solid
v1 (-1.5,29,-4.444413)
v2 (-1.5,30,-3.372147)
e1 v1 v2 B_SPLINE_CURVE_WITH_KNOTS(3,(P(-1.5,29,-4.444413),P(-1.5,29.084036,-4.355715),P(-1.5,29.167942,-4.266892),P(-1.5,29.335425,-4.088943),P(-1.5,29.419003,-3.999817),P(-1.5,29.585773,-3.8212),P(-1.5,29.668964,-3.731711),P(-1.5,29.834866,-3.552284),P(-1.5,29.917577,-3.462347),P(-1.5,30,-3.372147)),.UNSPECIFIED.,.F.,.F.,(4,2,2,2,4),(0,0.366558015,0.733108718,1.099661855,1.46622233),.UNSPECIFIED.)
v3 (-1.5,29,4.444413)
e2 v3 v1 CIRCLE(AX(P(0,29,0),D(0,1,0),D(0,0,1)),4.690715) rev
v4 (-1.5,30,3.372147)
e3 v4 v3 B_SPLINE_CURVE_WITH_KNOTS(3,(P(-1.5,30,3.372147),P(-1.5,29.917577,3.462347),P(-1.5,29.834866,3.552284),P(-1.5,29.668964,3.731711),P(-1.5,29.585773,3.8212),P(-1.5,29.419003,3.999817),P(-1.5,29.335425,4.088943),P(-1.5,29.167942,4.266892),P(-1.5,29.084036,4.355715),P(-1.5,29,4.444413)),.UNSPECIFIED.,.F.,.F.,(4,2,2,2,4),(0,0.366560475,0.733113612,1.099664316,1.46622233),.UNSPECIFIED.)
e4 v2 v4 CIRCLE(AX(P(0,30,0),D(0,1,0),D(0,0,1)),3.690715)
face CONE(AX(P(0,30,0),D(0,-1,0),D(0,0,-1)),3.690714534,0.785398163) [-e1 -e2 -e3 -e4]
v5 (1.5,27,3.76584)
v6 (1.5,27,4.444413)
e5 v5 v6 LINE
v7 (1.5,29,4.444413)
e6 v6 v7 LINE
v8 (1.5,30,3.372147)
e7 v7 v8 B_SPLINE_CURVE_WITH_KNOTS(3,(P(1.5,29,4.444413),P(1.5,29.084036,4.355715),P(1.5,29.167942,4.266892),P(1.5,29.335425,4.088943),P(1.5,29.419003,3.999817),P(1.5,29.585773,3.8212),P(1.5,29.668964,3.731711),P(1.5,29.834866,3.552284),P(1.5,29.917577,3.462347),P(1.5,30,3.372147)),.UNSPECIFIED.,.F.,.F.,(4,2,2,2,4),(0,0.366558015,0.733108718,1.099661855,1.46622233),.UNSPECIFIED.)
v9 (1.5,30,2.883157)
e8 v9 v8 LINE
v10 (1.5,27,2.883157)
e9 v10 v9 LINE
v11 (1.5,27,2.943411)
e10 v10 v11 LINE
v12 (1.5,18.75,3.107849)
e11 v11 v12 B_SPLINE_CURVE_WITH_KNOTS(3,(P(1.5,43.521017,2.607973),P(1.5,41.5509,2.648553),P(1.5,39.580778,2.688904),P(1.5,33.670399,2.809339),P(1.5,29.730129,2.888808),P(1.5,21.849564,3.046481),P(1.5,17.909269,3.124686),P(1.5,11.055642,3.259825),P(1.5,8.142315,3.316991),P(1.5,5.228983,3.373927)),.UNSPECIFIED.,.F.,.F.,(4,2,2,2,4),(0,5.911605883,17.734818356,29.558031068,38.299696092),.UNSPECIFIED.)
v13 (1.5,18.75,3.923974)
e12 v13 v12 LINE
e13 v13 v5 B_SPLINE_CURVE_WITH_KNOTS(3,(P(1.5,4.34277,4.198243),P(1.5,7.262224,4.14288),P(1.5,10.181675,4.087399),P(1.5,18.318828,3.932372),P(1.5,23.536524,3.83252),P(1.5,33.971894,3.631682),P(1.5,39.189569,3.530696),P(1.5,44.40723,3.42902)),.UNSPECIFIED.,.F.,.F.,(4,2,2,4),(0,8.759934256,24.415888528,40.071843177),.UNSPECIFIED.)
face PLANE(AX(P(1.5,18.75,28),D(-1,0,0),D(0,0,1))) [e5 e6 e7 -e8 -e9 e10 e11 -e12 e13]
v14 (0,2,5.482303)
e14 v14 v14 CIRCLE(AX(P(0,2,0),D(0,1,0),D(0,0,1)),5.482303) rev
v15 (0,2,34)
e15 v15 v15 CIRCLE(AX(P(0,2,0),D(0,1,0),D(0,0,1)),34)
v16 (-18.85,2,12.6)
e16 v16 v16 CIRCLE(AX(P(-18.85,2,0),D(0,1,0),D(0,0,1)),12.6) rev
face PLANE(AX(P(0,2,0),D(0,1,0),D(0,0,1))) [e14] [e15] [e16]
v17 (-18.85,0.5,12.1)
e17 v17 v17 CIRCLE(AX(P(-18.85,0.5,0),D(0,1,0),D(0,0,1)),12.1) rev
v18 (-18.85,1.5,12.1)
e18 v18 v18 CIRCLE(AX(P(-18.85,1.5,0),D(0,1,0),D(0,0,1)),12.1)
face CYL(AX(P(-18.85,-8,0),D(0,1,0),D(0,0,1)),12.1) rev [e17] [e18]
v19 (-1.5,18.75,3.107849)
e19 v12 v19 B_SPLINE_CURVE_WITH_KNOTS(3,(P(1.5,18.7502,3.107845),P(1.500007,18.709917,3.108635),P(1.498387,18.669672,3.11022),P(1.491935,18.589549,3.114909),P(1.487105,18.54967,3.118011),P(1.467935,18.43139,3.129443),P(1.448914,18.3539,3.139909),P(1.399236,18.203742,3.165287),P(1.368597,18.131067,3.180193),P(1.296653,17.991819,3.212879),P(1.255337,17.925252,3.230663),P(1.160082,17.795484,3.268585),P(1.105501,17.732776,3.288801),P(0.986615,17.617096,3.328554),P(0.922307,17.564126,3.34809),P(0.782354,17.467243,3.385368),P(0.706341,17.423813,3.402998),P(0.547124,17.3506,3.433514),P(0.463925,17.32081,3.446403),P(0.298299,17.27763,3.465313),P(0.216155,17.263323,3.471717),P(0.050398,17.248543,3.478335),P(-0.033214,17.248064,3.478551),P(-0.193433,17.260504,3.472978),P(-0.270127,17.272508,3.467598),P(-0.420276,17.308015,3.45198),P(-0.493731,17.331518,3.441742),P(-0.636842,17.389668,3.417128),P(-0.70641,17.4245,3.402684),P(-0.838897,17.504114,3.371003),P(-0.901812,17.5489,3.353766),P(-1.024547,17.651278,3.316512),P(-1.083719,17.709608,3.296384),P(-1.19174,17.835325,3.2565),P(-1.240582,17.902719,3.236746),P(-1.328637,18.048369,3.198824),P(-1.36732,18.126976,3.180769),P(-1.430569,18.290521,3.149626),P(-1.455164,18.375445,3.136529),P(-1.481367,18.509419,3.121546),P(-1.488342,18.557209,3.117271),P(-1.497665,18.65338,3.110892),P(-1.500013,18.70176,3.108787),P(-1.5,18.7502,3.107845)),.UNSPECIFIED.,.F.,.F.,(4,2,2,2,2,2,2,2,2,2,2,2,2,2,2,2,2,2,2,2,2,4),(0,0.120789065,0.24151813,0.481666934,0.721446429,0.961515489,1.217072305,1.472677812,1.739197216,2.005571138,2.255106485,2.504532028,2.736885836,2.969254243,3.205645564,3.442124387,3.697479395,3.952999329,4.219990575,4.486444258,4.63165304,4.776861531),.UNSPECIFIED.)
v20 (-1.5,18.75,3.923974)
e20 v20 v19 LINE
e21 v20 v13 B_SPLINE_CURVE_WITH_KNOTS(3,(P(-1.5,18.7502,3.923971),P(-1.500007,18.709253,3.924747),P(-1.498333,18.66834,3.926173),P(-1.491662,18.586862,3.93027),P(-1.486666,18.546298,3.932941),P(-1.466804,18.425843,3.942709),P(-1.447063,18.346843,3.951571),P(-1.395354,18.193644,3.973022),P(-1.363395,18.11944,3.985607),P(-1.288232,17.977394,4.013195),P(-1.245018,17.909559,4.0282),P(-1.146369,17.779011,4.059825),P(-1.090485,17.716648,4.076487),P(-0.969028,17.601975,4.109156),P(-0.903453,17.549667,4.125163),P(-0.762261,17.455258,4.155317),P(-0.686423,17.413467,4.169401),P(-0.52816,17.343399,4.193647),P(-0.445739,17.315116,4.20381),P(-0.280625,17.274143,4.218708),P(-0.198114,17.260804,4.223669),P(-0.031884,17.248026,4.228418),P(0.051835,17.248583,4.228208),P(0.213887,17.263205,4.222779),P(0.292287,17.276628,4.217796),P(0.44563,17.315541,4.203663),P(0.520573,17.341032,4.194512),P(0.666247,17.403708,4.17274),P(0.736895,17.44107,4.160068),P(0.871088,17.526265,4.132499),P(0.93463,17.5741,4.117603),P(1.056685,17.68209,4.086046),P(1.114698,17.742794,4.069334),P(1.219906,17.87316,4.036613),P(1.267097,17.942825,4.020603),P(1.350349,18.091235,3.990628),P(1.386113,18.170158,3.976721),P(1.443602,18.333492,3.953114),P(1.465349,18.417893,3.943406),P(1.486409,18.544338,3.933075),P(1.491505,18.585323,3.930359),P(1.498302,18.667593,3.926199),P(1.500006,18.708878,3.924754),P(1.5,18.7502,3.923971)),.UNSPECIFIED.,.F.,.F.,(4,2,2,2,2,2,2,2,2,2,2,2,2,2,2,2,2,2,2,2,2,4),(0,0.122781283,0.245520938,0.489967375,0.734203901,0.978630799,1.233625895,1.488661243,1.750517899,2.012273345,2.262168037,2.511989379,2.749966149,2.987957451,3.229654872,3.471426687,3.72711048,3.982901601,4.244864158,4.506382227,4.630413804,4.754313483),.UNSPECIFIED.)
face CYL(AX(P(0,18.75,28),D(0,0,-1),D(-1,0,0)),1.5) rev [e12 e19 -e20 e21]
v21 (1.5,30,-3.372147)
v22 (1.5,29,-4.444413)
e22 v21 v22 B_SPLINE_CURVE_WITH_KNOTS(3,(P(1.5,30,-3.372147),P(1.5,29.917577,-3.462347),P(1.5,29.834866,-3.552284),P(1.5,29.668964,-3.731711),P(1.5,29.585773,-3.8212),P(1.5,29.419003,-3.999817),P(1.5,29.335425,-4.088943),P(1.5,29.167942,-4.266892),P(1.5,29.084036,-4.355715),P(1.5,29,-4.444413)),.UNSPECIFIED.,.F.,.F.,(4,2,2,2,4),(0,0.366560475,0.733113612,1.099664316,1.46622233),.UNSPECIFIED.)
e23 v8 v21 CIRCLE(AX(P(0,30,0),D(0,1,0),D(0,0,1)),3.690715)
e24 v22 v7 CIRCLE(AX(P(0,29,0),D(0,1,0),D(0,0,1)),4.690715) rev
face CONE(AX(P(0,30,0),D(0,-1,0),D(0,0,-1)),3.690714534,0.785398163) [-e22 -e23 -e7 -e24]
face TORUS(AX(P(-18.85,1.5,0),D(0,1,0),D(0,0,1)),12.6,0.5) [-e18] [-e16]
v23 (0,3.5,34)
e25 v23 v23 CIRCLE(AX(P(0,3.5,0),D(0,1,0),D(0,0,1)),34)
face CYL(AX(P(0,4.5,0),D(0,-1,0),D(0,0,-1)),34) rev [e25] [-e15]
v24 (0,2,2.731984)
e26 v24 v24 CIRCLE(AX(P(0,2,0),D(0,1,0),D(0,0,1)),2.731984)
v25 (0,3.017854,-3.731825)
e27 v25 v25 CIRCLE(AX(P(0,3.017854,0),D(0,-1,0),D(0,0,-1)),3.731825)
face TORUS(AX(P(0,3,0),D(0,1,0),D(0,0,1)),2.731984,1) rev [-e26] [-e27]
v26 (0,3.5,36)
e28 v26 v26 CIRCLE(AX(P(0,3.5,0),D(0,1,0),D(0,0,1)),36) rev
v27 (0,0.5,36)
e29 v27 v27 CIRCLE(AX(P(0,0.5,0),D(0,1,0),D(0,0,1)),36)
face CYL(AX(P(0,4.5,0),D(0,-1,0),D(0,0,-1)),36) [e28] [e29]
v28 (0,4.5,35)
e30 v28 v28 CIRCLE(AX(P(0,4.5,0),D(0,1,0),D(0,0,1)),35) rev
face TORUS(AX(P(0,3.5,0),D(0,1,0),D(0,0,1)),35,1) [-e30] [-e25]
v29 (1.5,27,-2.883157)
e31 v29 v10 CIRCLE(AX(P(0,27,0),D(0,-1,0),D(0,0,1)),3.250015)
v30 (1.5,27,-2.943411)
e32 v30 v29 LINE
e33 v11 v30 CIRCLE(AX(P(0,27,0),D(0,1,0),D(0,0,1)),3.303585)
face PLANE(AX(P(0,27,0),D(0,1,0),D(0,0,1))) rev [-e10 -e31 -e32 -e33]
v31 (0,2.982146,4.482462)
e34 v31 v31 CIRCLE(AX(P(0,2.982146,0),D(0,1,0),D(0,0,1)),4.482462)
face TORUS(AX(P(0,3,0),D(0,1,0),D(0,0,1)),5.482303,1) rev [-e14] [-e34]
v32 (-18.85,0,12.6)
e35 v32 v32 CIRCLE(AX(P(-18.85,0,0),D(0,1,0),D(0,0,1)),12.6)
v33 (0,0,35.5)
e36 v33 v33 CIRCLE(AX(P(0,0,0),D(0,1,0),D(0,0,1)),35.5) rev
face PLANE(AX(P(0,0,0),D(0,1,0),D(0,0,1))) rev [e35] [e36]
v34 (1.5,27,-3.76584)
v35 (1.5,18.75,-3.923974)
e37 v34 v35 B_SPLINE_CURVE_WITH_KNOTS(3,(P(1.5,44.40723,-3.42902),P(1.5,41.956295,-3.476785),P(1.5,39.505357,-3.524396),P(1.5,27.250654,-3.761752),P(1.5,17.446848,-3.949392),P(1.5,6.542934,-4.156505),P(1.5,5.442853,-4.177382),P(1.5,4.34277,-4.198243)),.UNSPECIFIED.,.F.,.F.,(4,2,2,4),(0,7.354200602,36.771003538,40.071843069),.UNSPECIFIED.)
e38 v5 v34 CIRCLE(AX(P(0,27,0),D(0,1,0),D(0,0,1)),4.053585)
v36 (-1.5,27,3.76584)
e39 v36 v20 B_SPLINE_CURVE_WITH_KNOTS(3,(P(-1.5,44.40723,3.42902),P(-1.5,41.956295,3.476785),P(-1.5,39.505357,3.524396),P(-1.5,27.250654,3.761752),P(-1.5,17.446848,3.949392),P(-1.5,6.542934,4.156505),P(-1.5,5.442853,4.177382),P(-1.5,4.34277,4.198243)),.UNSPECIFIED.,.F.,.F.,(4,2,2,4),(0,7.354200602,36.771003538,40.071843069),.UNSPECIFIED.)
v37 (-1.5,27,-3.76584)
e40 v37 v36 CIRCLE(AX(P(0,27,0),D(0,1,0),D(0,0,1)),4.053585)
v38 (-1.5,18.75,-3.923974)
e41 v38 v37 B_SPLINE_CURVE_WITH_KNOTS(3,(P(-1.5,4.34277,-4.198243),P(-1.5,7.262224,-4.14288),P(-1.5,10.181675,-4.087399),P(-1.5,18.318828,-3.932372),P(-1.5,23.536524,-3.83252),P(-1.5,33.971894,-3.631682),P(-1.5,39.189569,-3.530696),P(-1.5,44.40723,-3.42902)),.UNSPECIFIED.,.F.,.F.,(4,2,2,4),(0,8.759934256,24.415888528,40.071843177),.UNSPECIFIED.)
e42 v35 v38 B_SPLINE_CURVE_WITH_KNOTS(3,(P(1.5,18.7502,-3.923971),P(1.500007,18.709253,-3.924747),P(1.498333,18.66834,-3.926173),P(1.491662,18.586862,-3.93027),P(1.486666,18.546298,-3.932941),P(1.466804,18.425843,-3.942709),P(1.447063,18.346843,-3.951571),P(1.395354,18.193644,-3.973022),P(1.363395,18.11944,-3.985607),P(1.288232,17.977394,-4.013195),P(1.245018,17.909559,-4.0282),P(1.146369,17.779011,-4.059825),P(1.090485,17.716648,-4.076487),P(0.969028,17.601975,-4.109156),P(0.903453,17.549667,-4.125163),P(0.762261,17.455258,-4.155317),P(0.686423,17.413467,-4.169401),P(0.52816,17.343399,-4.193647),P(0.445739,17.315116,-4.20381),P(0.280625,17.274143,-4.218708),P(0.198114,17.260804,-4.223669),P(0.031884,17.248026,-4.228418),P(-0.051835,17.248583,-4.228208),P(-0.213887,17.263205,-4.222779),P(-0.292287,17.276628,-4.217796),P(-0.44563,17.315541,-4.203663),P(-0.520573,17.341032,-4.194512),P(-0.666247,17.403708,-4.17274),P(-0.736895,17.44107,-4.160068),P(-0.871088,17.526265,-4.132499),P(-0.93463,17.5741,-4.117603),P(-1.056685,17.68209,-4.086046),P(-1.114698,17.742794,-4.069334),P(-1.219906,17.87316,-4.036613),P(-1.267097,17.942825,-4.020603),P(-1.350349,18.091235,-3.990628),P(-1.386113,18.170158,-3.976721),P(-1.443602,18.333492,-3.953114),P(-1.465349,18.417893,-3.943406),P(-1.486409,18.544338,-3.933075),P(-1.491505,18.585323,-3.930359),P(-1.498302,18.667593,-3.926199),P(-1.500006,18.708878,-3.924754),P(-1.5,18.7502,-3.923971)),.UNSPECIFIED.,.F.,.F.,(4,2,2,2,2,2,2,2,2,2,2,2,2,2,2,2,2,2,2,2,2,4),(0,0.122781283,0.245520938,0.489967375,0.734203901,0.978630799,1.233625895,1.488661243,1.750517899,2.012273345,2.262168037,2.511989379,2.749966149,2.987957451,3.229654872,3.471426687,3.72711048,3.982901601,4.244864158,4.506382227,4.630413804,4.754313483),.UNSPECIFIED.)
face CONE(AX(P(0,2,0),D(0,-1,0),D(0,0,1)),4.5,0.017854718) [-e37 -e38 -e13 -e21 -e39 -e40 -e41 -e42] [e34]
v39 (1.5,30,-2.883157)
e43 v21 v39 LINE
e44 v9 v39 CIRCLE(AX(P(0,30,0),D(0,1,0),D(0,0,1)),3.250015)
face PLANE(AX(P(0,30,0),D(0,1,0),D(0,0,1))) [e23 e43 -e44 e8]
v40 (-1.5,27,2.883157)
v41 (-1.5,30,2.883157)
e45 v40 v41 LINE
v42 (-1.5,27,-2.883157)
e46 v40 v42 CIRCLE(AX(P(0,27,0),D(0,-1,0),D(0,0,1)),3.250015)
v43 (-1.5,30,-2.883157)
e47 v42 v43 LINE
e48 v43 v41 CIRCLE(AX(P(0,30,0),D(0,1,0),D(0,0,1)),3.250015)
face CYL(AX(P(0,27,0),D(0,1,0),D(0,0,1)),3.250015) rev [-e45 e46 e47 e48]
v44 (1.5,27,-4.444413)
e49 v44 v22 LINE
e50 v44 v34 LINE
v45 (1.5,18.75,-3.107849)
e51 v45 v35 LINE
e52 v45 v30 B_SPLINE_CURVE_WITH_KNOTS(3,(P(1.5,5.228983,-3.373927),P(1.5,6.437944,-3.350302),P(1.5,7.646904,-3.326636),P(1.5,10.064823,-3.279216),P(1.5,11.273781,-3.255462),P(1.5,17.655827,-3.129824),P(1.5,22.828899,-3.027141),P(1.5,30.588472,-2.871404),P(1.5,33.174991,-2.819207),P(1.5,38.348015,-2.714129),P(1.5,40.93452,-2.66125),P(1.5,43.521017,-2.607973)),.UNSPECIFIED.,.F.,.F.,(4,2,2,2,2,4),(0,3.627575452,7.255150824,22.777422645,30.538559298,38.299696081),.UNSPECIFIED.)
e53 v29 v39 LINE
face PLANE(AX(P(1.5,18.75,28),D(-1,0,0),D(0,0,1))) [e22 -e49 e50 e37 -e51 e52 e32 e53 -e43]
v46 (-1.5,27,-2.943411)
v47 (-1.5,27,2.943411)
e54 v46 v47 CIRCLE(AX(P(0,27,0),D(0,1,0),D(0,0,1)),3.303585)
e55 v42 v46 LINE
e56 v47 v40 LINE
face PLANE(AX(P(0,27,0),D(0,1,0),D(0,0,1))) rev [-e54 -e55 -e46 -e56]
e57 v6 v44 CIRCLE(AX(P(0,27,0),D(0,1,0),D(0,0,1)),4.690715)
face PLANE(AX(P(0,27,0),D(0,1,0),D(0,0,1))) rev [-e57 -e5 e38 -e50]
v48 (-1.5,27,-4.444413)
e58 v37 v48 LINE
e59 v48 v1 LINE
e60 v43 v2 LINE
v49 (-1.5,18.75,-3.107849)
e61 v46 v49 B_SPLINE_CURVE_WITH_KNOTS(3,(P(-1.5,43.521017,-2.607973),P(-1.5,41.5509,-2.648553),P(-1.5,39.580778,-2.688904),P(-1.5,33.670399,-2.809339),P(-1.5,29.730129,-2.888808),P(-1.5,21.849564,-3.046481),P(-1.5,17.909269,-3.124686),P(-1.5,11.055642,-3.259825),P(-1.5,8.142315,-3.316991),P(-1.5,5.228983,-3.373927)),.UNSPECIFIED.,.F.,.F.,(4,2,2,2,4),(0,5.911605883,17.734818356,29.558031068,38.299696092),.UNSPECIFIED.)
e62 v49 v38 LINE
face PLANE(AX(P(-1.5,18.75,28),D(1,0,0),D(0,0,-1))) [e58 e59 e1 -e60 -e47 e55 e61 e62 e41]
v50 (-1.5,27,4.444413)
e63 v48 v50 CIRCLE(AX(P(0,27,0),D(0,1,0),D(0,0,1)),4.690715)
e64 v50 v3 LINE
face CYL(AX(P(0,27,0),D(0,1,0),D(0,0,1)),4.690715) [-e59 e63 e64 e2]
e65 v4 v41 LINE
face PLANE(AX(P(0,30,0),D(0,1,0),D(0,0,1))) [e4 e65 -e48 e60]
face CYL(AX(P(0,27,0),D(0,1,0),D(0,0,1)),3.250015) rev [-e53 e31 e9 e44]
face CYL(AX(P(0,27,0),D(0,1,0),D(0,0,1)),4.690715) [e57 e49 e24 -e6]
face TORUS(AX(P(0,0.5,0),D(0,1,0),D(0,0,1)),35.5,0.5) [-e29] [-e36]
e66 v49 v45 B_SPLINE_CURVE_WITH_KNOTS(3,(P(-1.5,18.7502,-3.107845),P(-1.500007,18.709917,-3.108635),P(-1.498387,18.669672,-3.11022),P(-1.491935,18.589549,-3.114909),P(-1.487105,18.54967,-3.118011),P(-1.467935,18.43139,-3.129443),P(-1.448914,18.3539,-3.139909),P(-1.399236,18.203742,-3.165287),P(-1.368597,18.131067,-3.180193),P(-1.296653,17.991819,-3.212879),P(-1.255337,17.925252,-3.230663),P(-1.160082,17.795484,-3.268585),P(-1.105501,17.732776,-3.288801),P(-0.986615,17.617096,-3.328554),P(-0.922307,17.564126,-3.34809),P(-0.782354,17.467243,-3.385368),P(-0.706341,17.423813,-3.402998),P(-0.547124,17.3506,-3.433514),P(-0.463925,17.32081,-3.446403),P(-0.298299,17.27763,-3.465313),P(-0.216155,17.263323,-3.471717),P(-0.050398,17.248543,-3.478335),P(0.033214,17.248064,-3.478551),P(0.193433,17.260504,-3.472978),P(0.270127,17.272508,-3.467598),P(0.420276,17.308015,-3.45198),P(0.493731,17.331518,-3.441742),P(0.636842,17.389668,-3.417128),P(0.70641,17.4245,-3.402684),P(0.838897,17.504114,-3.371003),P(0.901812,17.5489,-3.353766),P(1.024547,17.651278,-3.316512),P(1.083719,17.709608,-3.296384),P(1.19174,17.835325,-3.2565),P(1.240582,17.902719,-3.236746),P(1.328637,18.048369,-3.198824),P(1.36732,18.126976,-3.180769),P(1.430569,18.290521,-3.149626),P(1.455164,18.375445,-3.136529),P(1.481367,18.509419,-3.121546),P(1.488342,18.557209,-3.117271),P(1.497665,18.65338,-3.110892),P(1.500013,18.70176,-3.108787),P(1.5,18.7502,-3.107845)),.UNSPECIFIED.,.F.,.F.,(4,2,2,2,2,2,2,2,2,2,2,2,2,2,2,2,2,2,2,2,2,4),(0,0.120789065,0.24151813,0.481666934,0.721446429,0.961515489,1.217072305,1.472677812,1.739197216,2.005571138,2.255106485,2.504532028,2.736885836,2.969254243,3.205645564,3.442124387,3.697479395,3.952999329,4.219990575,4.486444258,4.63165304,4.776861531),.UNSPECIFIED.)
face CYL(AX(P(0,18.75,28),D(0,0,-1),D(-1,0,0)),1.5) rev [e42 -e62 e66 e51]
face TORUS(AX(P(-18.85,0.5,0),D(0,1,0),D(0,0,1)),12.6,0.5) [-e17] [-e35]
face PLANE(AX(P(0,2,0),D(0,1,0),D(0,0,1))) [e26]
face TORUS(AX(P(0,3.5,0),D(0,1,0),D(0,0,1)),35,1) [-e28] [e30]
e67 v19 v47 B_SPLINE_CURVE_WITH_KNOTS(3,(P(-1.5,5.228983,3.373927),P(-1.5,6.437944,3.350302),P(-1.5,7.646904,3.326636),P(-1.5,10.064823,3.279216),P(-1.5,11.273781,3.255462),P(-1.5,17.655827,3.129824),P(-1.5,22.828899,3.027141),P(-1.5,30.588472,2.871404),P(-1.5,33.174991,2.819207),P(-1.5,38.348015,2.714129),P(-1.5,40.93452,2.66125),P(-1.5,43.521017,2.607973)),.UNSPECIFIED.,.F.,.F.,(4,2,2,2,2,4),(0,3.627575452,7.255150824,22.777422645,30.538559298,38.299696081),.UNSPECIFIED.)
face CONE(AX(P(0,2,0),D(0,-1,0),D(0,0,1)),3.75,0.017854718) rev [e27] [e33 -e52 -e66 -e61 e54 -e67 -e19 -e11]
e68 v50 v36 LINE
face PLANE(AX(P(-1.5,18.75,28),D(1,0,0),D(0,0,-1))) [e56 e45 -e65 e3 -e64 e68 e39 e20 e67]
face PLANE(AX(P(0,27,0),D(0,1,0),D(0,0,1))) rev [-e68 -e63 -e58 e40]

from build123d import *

# Parameters (mm, degrees)
SKETCH1_R               = 36
BOSS_EXTRUDE1_DEPTH     = 4.5
SHELL1_T                = -2
SKETCH2_R               = 4.5
BOSS_EXTRUDE2_DEPTH     = 28
BOSS_EXTRUDE2_TAPER     = 1.023
CUT_EXTRUDE1_DEPTH      = 28
CUT_EXTRUDE1_DEPTH_BACK = 28
SKETCH5_R               = 3.75
CUT_EXTRUDE2_DEPTH      = 28
CUT_EXTRUDE2_TAPER      = 1.023
FILLET1_R               = 1
FILLET2_R               = 1
BOSS_EXTRUDE3_DEPTH     = 3
CHAMFER1_SIZE           = 1
SKETCH8_R               = 12.1
CUT_EXTRUDE3_DEPTH      = 10
FILLET3_R               = 0.5
FILLET4_R               = 1


with BuildPart() as part:
    # Sketch1 → Boss-Extrude1 (new body)
    with BuildSketch(Plane(origin=(0, 0, 0), x_dir=(1, 0, 0), z_dir=(0, 1, 0))):
        with Locations(Location((0, 0, 0), (0, 0, 270))):
            Circle(SKETCH1_R)
    extrude(amount=BOSS_EXTRUDE1_DEPTH)

    # Shell1
    shell1_openings = [part.faces().sort_by_distance(p)[0] for p in [
        (0, 4.5, 0),
    ]]
    offset(amount=SHELL1_T, openings=shell1_openings, kind=Kind.INTERSECTION)

    # Sketch2 → Boss-Extrude2 (add)
    with BuildSketch(Plane(origin=(0, 2, 0), x_dir=(1, 0, 0), z_dir=(0, 1, 0))):
        Circle(SKETCH2_R)
    extrude(amount=BOSS_EXTRUDE2_DEPTH, taper=BOSS_EXTRUDE2_TAPER)

    # Sketch3 → Cut-Extrude1 (cut, two sides: drawn at the far end of the back side and taken through both)
    with BuildSketch(Plane.XY.offset(-CUT_EXTRUDE1_DEPTH_BACK)):
        with BuildLine():
            Line((-1.5, 18.75), (-1.5, 30))
            ThreePointArc((-1.5, 30), (0, 31.5), (1.5, 30))
            Line((1.5, 30), (1.5, 18.75))
            ThreePointArc((1.5, 18.75), (0, 17.25), (-1.5, 18.75))
        make_face()
    extrude(amount=CUT_EXTRUDE1_DEPTH + CUT_EXTRUDE1_DEPTH_BACK, mode=Mode.SUBTRACT)

    # Sketch5 → Cut-Extrude2 (cut)
    with BuildSketch(Plane(origin=(0, 2, 0), x_dir=(1, 0, 0), z_dir=(0, 1, 0))):
        Circle(SKETCH5_R)
    extrude(amount=CUT_EXTRUDE2_DEPTH, taper=CUT_EXTRUDE2_TAPER, mode=Mode.SUBTRACT)

    # Fillet1
    fillet1_edges = [part.edges().sort_by_distance(p)[0] for p in [
        (-3.75, 2, 0),
    ]]
    fillet(fillet1_edges, radius=FILLET1_R)

    # Fillet2
    fillet2_edges = [part.edges().sort_by_distance(p)[0] for p in [
        (0, 4.5, -36),
        (0, 4.5, -34),
    ]]
    fillet(fillet2_edges, radius=FILLET2_R - 0.0001)  # a hair under: the kernel refuses the full size

    # Sketch6 → Boss-Extrude3 (add)
    with BuildSketch(Plane(origin=(0, 30, 0), x_dir=(1, 0, 0), z_dir=(0, 1, 0))):
        with BuildLine():
            Line((1.5, 2.883157284), (1.5, 4.444412541))
            ThreePointArc((1.5, 4.444412541), (4.690714534, 0), (1.5, -4.444412541))
            Line((1.5, -4.444412541), (1.5, -2.883157284))
            ThreePointArc((1.5, -2.883157284), (3.250014758, 0), (1.5, 2.883157284))
        make_face()
        with BuildLine():
            Line((-1.5, 2.883157284), (-1.5, 4.444412541))
            ThreePointArc((-1.5, 4.444412541), (-4.690714534, 0), (-1.5, -4.444412541))
            Line((-1.5, -4.444412541), (-1.5, -2.883157284))
            ThreePointArc((-1.5, -2.883157284), (-3.250014758, 0), (-1.5, 2.883157284))
        make_face()
    extrude(amount=-BOSS_EXTRUDE3_DEPTH)

    # Chamfer1
    chamfer1_edges = [part.edges().sort_by_distance(p)[0] for p in [
        (4.690714534, 30, 0),
        (-4.690714534, 30, 0),
    ]]
    chamfer(chamfer1_edges, length=CHAMFER1_SIZE)

    # Sketch8 → Cut-Extrude3 (cut)
    with BuildSketch(Plane(origin=(0, 2, 0), x_dir=(1, 0, 0), z_dir=(0, 1, 0))):
        with Locations(Location((-18.85, 0, 0), (0, 0, 270))):
            Circle(SKETCH8_R)
    extrude(amount=-CUT_EXTRUDE3_DEPTH, mode=Mode.SUBTRACT)

    # Fillet3
    fillet3_edges = [part.edges().sort_by_distance(p)[0] for p in [
        (-18.85, 0, -12.1),
        (-18.85, 2, -12.1),
        (0, 0, -36),
    ]]
    fillet(fillet3_edges, radius=FILLET3_R)

    # Fillet4
    fillet4_edges = [part.edges().sort_by_distance(p)[0] for p in [
        (-4.5, 2, 0),
    ]]
    fillet(fillet4_edges, radius=FILLET4_R)


solid = part.part
